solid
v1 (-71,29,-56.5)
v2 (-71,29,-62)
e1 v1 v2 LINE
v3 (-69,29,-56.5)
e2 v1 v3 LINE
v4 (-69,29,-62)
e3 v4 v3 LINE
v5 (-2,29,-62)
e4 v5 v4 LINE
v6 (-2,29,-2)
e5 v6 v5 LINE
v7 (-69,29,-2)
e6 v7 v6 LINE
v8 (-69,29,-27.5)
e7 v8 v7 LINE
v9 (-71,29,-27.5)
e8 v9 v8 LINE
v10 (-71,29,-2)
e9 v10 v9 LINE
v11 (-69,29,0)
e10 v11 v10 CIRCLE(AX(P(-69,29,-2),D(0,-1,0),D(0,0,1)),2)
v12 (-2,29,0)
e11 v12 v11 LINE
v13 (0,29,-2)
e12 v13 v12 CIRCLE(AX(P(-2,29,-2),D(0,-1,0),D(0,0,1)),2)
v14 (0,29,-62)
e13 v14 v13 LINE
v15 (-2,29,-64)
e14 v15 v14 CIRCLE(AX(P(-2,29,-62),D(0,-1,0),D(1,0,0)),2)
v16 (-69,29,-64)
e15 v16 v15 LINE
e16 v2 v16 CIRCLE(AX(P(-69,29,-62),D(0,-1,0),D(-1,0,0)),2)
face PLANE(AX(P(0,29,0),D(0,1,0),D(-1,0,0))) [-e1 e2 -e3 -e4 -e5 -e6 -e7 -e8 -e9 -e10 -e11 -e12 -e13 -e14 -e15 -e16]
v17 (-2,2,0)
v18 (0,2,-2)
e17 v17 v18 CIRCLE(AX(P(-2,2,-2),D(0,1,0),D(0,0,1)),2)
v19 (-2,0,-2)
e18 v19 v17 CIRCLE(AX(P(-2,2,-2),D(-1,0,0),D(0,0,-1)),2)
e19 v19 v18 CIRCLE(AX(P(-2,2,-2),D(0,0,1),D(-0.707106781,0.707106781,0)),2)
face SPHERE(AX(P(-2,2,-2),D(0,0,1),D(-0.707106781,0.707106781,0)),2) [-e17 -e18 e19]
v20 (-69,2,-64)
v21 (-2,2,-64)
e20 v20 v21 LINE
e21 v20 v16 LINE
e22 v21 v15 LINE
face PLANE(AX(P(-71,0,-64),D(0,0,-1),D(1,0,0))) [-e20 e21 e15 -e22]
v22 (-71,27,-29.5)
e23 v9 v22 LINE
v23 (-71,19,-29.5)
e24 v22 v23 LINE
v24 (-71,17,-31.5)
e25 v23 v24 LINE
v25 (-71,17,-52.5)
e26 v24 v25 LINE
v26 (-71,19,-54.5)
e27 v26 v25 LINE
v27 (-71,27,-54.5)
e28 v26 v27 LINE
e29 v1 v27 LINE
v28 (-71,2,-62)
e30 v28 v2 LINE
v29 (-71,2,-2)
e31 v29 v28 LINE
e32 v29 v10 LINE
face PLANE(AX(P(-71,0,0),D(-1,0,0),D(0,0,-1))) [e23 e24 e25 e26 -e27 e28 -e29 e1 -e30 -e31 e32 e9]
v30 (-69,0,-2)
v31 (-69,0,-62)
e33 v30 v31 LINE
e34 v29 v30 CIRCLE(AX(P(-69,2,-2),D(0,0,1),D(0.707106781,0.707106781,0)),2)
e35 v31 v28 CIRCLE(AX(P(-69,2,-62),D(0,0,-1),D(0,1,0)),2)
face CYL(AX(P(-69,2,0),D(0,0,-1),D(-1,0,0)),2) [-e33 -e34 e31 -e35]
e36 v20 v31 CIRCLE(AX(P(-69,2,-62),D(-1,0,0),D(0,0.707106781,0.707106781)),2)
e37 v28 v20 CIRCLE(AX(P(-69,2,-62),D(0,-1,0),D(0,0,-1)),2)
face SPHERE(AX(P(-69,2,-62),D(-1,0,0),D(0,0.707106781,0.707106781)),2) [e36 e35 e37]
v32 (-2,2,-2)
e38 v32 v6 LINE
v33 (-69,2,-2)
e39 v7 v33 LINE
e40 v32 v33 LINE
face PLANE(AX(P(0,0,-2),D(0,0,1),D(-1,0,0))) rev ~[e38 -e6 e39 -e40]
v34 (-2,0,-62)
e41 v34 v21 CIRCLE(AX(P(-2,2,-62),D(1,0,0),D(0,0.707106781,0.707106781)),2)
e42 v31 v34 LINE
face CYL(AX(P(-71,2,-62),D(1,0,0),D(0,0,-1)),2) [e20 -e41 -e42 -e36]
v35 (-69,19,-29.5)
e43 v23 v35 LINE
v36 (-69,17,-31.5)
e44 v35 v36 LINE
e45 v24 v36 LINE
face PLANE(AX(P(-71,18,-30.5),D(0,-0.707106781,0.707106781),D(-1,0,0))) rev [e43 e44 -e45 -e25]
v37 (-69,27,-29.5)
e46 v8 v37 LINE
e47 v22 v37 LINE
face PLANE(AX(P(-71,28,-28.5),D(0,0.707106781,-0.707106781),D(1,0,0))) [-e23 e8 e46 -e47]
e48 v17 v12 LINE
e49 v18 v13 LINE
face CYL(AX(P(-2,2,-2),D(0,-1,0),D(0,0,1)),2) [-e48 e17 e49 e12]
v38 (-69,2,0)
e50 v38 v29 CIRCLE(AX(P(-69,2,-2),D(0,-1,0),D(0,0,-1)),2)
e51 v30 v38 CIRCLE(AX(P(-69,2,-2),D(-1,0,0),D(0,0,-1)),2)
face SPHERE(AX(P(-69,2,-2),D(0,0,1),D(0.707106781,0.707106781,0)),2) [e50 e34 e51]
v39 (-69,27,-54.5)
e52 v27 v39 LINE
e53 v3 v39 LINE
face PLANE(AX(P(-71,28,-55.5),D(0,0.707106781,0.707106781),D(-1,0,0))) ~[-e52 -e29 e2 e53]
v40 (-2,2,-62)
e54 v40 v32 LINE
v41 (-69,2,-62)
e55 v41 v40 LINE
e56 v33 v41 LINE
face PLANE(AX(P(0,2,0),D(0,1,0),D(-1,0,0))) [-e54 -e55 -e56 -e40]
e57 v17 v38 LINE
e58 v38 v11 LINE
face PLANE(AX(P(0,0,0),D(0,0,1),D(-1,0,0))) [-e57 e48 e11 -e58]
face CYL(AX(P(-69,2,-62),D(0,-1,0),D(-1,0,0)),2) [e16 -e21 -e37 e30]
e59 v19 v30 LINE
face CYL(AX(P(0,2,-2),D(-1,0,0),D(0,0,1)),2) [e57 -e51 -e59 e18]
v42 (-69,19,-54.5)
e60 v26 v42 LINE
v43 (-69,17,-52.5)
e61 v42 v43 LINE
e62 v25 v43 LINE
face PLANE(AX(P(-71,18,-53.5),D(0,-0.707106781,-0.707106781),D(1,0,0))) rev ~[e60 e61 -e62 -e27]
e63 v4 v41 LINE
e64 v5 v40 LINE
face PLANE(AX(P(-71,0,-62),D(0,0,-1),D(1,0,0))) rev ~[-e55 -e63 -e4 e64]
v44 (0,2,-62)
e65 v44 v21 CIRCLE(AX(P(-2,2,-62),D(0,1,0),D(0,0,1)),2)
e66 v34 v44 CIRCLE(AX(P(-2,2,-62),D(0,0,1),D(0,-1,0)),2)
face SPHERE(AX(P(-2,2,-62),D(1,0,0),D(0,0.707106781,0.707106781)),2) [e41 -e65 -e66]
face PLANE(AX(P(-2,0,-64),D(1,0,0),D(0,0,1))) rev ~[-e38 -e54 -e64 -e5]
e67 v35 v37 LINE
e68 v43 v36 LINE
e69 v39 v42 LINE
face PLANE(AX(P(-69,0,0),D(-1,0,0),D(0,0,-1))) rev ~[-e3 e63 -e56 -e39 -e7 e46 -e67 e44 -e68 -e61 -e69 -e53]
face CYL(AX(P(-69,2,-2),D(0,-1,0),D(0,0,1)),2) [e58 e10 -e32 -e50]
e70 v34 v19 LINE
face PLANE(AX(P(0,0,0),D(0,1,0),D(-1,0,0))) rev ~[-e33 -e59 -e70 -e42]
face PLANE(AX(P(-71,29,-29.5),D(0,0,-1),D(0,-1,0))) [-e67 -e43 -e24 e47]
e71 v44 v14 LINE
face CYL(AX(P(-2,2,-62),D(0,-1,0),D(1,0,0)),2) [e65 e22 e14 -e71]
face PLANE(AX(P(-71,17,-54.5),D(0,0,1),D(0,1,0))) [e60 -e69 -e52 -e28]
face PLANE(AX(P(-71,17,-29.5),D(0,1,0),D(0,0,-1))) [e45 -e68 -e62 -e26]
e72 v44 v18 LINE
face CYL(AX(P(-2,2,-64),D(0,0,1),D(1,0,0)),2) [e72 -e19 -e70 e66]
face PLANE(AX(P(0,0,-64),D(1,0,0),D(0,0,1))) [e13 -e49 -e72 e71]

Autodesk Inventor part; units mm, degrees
ref_plane "YZ Plane" through (0, 0, 0) normal (1, 0, 0) x (0, 1, 0)
ref_plane "XZ Plane" through (0, 0, 0) normal (0, 1, 0) x (-1, 0, 0)
ref_plane "XY Plane" through (0, 0, 0) normal (0, 0, 1) x (1, 0, 0)
sketch "Schizzo1" plane through (0, 0, 0) normal (0, 1, 0) x (-1, 0, 0)
  line L0 (0, 0) -> (71, 0)
  line L1 (71, 0) -> (71, -64)
  line L2 (71, -64) -> (0, -64)
  line L3 (0, -64) -> (0, 0)
  dimension "d0" = 71
  dimension "d1" = 64
extrude "Estrusione1" add sketch "Schizzo1" along normal blind 29
shell "Svuotamento1" thickness 2 removed faces 1 at (-23.6667, 29, -21.3333)
fillet "Raccordo1" radius 2 4 edges at (0, 0, -32) (-35.5, 0, -64) (-35.5, 0, 0) (-71, 0, -32)
fillet "Raccordo2" radius 2 8 edges at (-0.5858, 0.5858, -63.4142) (0, 15.5, -64) (-0.5858, 0.5858, -0.5858) (0, 15.5, 0) (-70.4142, 0.5858, -63.4142) (-71, 15.5, -64) (-70.4142, 0.5858, -0.5858) (-71, 15.5, 0)
sketch "Schizzo3" plane through (-71, 2, -2) normal (-1, 0, 0) x (0, 0, 1)
  line L0 (-52.5, 27) -> (-27.5, 27)
  line L1 (-27.5, 27) -> (-27.5, 15)
  line L2 (-27.5, 15) -> (-52.5, 15)
  line L3 (-52.5, 15) -> (-52.5, 27)
  line L4 (-62, 27) -> (-62, 0) projected
  line L5 (-60, 27) -> (0, 27) projected
  line L6 (-60, 0) -> (-60, 27) projected
  line L7 (-60, 0) -> (-60, 27) projected
  point P0 (2, -2)
  dimension "d16" = 0
  dimension "d17" = 12
  dimension "d23" = 7.5
  dimension "d24" = 25
extrude "Estrusione3" cut sketch "Schizzo3" against normal up to next
chamfer "Smusso2" distance 2 angle 45 4 edges at (-70, 29, -54.5) (-70, 29, -29.5) (-70, 17, -29.5) (-70, 17, -54.5)
properties part number "Board_cover"
